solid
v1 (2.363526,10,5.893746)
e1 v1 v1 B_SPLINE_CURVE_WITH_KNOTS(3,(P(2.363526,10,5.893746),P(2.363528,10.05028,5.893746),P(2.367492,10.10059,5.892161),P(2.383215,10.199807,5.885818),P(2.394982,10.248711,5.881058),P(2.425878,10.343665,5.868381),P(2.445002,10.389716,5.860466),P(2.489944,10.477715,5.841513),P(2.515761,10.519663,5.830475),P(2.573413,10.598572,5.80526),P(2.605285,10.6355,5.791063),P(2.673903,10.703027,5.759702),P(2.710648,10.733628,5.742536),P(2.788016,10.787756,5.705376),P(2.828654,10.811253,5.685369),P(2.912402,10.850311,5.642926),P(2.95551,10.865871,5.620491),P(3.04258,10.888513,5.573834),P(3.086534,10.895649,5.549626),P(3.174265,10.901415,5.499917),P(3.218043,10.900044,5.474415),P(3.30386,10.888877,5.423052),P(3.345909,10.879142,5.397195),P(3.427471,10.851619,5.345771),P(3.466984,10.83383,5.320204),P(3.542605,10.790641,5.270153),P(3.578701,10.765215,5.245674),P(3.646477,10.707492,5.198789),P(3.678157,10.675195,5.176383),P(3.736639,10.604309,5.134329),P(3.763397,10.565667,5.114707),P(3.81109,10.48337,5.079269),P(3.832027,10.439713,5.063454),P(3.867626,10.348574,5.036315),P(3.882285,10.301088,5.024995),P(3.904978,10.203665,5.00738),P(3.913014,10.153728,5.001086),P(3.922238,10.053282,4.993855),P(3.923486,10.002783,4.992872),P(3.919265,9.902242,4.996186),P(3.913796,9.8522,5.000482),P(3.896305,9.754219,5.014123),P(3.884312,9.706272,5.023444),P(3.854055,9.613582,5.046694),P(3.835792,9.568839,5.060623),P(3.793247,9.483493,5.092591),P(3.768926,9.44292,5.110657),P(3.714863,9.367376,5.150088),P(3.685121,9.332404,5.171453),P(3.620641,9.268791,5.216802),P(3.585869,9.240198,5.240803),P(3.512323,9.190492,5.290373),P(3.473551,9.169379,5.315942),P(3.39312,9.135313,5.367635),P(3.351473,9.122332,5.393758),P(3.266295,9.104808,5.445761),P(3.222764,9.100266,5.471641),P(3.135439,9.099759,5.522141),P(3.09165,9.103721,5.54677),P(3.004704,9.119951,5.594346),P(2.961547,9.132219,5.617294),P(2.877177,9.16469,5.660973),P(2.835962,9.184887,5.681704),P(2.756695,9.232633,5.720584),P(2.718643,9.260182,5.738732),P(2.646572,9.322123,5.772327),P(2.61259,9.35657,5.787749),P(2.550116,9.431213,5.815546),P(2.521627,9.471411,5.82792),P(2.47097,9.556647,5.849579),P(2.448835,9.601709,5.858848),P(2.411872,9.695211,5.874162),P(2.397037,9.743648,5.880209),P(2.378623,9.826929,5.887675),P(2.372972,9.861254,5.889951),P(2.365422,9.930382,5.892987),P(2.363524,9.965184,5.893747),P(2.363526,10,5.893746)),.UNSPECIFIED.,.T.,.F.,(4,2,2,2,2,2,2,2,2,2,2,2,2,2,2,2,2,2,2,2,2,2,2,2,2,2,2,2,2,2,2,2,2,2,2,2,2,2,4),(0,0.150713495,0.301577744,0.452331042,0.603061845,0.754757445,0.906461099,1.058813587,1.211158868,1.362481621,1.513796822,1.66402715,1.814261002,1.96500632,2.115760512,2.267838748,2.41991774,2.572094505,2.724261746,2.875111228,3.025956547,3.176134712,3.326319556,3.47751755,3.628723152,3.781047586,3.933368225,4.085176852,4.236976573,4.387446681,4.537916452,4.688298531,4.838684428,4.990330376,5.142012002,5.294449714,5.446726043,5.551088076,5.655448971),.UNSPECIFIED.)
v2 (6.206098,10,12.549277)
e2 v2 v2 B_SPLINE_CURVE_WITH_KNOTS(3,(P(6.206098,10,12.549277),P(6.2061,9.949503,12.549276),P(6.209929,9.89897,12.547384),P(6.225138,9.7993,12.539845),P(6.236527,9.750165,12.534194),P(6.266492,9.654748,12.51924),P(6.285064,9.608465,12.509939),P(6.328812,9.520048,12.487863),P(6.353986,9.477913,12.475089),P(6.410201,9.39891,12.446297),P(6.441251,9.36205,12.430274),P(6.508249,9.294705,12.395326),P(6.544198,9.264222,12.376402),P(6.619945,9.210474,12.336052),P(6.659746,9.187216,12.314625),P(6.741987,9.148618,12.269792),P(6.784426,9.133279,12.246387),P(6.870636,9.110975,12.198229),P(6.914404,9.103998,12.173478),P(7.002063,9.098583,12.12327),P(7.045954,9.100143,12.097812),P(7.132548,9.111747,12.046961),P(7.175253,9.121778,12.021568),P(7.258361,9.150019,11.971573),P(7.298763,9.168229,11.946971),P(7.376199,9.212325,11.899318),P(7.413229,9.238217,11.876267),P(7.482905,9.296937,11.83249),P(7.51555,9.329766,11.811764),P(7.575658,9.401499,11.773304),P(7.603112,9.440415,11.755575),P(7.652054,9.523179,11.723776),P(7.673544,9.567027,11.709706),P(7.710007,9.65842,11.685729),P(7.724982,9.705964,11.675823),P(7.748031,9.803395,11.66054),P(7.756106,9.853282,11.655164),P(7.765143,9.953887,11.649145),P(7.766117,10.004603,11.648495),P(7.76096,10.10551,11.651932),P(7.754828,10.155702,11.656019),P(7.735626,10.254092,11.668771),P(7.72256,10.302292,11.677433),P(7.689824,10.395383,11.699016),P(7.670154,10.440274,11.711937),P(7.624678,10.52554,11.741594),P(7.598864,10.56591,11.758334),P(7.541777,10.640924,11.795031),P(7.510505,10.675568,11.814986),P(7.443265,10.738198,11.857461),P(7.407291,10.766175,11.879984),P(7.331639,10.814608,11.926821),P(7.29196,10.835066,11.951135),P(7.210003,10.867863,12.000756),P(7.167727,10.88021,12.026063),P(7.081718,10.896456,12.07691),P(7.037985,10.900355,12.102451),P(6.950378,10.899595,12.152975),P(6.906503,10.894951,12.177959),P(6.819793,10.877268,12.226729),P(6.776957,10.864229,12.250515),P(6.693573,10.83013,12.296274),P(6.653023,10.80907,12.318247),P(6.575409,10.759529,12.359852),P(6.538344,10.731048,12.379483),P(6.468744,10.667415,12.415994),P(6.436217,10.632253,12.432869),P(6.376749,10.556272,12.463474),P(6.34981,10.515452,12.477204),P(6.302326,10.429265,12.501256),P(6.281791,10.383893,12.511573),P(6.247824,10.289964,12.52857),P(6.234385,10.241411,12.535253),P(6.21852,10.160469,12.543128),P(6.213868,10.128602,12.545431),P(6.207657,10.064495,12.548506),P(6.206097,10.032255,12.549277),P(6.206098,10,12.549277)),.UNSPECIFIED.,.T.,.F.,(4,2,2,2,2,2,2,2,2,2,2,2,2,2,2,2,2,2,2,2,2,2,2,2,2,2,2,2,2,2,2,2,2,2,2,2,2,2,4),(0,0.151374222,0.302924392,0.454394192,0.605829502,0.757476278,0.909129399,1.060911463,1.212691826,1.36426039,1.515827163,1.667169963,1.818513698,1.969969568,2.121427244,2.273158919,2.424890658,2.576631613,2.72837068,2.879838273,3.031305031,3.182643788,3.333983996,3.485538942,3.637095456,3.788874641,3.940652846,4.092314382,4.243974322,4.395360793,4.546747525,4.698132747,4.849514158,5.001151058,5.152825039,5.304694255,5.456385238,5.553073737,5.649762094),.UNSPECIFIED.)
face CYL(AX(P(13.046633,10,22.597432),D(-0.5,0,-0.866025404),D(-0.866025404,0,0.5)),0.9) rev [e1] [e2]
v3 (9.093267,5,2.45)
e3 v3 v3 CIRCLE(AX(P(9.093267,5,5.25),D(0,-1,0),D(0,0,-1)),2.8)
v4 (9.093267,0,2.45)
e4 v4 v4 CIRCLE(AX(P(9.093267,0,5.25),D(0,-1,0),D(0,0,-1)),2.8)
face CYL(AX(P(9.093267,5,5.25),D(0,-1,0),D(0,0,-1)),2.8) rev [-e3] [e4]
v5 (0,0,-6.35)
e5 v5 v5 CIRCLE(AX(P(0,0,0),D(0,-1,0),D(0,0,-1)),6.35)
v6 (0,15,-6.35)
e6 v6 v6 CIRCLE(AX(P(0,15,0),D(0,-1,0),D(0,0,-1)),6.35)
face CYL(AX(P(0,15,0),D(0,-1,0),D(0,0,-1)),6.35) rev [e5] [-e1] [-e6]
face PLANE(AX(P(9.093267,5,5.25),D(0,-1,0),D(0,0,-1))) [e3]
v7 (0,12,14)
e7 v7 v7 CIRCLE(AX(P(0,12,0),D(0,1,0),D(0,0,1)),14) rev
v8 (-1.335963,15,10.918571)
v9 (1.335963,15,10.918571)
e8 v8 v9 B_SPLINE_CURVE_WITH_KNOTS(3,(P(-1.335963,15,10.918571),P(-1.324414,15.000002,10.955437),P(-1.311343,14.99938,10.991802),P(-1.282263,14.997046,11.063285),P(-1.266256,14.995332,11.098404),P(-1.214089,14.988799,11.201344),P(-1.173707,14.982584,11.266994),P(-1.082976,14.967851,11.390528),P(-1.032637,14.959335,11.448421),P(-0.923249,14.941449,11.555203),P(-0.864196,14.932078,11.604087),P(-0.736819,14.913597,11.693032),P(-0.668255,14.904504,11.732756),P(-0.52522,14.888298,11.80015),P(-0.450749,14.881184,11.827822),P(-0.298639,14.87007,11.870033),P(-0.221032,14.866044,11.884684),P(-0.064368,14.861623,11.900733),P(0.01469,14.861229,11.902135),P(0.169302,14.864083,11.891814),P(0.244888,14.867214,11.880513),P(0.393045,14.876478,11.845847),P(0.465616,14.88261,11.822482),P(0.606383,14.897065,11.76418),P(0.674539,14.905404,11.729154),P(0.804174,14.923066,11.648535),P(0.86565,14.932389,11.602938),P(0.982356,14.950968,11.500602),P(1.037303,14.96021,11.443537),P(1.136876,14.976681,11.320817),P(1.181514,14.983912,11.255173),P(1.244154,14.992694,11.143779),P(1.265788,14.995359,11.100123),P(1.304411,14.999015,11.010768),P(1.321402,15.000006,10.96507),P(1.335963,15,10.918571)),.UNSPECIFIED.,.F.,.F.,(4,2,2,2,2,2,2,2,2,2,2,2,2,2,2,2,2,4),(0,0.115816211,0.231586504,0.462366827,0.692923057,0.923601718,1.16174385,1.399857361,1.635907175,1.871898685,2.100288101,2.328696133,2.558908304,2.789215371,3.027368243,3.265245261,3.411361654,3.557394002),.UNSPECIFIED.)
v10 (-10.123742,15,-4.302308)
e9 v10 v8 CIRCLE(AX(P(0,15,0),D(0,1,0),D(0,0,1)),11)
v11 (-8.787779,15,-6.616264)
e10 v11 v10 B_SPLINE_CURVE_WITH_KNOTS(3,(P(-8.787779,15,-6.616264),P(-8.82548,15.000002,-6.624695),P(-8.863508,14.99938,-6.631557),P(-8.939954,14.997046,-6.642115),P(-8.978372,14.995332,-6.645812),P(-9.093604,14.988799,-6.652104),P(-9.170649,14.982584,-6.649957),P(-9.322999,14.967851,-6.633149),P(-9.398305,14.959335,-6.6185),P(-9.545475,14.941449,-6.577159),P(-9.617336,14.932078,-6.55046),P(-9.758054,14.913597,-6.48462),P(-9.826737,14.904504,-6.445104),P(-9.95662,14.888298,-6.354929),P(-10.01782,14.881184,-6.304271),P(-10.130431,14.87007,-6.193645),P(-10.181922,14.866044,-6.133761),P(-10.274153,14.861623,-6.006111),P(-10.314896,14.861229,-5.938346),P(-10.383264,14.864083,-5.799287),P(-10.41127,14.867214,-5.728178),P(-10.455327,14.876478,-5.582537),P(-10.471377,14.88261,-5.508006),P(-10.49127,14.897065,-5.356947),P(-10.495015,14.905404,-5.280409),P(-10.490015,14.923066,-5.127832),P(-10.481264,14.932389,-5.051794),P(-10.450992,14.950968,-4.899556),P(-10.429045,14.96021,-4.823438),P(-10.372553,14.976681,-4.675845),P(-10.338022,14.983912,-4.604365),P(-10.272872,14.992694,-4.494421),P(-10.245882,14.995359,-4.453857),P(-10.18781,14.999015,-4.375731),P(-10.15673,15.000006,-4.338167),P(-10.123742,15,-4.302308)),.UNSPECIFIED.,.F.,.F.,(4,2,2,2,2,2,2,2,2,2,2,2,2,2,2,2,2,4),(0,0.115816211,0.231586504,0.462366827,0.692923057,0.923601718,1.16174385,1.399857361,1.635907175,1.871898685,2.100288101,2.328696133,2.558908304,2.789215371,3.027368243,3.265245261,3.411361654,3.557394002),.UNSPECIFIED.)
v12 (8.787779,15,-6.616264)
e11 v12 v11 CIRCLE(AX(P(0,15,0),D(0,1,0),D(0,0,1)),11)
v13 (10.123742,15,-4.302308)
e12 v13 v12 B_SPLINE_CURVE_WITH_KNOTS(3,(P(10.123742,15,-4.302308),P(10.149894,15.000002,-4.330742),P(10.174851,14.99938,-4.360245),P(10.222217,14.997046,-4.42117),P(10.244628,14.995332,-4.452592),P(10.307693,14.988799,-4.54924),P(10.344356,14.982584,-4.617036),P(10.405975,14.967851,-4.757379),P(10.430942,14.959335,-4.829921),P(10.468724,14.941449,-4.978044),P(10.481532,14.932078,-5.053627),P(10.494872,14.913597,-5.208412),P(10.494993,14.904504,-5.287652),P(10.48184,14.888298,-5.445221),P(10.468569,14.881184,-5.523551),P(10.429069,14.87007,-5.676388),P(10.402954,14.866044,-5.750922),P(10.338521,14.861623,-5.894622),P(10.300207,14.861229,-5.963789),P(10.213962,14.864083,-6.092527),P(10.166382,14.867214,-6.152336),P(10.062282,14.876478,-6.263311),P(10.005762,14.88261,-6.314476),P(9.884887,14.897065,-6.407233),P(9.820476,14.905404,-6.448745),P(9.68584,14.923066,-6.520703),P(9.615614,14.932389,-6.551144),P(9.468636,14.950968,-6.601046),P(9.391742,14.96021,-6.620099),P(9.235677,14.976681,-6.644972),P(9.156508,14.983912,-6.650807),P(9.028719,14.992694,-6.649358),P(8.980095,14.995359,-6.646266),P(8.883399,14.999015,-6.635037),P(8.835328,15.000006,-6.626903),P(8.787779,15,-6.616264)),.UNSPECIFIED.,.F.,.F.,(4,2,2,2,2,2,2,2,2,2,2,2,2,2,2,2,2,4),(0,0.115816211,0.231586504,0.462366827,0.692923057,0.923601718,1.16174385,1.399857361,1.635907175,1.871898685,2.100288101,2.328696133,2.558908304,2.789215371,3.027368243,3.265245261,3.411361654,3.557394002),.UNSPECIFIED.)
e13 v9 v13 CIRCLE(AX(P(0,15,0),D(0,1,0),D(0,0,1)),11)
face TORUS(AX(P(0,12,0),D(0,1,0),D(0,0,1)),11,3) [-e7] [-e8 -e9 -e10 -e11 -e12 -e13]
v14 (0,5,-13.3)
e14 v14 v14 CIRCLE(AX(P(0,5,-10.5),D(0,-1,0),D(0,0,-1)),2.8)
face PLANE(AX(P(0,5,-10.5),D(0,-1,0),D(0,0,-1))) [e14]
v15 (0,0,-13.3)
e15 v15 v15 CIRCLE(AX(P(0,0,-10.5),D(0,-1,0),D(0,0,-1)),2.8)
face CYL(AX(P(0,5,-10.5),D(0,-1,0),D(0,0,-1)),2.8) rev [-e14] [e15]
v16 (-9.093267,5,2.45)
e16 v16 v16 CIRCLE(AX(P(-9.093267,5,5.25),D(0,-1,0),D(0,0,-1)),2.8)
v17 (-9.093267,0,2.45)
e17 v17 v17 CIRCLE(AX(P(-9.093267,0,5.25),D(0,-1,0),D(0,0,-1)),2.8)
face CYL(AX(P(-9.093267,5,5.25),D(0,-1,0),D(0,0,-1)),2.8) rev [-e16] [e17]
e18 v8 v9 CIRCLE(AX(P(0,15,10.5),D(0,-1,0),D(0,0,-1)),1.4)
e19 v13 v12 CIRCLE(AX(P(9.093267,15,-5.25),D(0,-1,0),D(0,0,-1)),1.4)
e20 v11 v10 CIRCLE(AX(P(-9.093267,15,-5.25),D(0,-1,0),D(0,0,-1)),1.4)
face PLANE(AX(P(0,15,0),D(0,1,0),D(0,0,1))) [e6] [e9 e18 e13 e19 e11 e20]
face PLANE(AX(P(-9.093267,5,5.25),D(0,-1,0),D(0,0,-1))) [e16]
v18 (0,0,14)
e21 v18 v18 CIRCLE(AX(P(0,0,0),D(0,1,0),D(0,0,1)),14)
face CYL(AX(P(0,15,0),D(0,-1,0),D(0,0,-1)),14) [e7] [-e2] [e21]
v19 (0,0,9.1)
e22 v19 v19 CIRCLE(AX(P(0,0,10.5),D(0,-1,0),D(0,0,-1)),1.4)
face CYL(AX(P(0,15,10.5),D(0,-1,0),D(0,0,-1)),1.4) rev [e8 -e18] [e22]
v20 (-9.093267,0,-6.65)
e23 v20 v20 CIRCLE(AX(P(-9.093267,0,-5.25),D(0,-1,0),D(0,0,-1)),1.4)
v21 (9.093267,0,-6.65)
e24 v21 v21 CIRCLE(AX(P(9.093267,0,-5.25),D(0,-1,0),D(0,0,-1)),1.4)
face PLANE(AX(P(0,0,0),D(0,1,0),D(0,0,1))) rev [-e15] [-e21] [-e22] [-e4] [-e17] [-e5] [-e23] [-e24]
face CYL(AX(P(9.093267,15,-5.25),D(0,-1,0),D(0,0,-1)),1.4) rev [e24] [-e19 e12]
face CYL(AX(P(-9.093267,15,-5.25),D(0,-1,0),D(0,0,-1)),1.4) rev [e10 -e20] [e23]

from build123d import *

# Parameters (mm, degrees)
SKETCH1_R               = 14
BOSS_EXTRUDE1_DEPTH     = 15
SKETCH2_R               = 1.4
SKETCH2_R_2             = 6.35
CUT_EXTRUDE1_DEPTH      = 25.839484697
BOSS_EXTRUDE2_DEPTH     = 2
CUT_EXTRUDE2_DEPTH      = 17
CUT_EXTRUDE2_DEPTH_BACK = 10
SKETCH4_R               = 0.9
SKETCH4_W               = 10.5
SKETCH4_H               = 2
SKETCH5_R               = 2.8
CUT_EXTRUDE3_DEPTH      = 5
FILLET1_R               = 3


with BuildPart() as part:
    # Sketch1 → Boss-Extrude1 (new body)
    with BuildSketch(Plane(origin=(0, 0, 0), x_dir=(1, 0, 0), z_dir=(0, 1, 0))):
        with Locations(Location((0, 0, 0), (0, 0, 270))):
            Circle(SKETCH1_R)
    extrude(amount=BOSS_EXTRUDE1_DEPTH)

    # Sketch2 → Cut-Extrude1 (cut, through all)
    with BuildSketch(Plane.XZ):
        with Locations(Location((0, 10.5, 0), (0, 0, 270))):
            Circle(SKETCH2_R)
        with Locations(Location((0, 0, 0), (0, 0, 270))):
            Circle(SKETCH2_R_2)
        with Locations(Location((9.09326674, -5.25, 0), (0, 0, 270))):
            Circle(SKETCH2_R)
        with Locations(Location((-9.09326674, -5.25, 0), (0, 0, 270))):
            Circle(SKETCH2_R)
    extrude(amount=-CUT_EXTRUDE1_DEPTH, mode=Mode.SUBTRACT)

    # Sketch3 → Boss-Extrude2 (add)
    with BuildSketch(Plane(origin=(0, 0, 0), x_dir=(1, 0, 0), z_dir=(0, 1, 0))):
        Polygon((0, 0), (9.09326674, -5.25), (0, -10.5), align=None)
    extrude(amount=-BOSS_EXTRUDE2_DEPTH)

    # Sketch4 → Cut-Extrude2 (cut, two sides: drawn at the far end of the back side and taken through both)
    with BuildSketch(Plane(origin=(4.54663337, 0, 7.875), x_dir=(0.8660254037844364, 0, -0.5000000000000041), z_dir=(0.500000000000004, 0, 0.8660254037844363)).offset(-CUT_EXTRUDE2_DEPTH_BACK)):
        with Locations(Location((0, 10, 0), (0, 0, 180))):
            Circle(SKETCH4_R)
        with Locations((0, -1)):
            Rectangle(SKETCH4_W, SKETCH4_H)
    extrude(amount=CUT_EXTRUDE2_DEPTH + CUT_EXTRUDE2_DEPTH_BACK, mode=Mode.SUBTRACT)

    # Sketch5 → Cut-Extrude3 (cut)
    with BuildSketch(Plane.XZ):
        with Locations(Location((9.09326674, 5.25, 0), (0, 0, 270))):
            Circle(SKETCH5_R)
        with Locations(Location((0, -10.5, 0), (0, 0, 270))):
            Circle(SKETCH5_R)
        with Locations(Location((-9.09326674, 5.25, 0), (0, 0, 270))):
            Circle(SKETCH5_R)
    extrude(amount=-CUT_EXTRUDE3_DEPTH, mode=Mode.SUBTRACT)

    # Fillet1
    # the kernel refuses this fillet: 3 mm, written as the material it takes off along each edge
    with BuildSketch(Plane(origin=(0, 15, 0), x_dir=(0, 0, 1), z_dir=(-1, 0, 0))) as fillet1_piece_1:
        with BuildLine():
            CenterArc((14 - FILLET1_R, -FILLET1_R), FILLET1_R, 0, 90)
            Line((14 - FILLET1_R, 0), (14, 0))
            Line((14, 0), (14, -FILLET1_R))
        make_face()
    revolve(axis=Axis((0, 15, 0), (0, 1, 0)), mode=Mode.SUBTRACT)


solid = part.part
